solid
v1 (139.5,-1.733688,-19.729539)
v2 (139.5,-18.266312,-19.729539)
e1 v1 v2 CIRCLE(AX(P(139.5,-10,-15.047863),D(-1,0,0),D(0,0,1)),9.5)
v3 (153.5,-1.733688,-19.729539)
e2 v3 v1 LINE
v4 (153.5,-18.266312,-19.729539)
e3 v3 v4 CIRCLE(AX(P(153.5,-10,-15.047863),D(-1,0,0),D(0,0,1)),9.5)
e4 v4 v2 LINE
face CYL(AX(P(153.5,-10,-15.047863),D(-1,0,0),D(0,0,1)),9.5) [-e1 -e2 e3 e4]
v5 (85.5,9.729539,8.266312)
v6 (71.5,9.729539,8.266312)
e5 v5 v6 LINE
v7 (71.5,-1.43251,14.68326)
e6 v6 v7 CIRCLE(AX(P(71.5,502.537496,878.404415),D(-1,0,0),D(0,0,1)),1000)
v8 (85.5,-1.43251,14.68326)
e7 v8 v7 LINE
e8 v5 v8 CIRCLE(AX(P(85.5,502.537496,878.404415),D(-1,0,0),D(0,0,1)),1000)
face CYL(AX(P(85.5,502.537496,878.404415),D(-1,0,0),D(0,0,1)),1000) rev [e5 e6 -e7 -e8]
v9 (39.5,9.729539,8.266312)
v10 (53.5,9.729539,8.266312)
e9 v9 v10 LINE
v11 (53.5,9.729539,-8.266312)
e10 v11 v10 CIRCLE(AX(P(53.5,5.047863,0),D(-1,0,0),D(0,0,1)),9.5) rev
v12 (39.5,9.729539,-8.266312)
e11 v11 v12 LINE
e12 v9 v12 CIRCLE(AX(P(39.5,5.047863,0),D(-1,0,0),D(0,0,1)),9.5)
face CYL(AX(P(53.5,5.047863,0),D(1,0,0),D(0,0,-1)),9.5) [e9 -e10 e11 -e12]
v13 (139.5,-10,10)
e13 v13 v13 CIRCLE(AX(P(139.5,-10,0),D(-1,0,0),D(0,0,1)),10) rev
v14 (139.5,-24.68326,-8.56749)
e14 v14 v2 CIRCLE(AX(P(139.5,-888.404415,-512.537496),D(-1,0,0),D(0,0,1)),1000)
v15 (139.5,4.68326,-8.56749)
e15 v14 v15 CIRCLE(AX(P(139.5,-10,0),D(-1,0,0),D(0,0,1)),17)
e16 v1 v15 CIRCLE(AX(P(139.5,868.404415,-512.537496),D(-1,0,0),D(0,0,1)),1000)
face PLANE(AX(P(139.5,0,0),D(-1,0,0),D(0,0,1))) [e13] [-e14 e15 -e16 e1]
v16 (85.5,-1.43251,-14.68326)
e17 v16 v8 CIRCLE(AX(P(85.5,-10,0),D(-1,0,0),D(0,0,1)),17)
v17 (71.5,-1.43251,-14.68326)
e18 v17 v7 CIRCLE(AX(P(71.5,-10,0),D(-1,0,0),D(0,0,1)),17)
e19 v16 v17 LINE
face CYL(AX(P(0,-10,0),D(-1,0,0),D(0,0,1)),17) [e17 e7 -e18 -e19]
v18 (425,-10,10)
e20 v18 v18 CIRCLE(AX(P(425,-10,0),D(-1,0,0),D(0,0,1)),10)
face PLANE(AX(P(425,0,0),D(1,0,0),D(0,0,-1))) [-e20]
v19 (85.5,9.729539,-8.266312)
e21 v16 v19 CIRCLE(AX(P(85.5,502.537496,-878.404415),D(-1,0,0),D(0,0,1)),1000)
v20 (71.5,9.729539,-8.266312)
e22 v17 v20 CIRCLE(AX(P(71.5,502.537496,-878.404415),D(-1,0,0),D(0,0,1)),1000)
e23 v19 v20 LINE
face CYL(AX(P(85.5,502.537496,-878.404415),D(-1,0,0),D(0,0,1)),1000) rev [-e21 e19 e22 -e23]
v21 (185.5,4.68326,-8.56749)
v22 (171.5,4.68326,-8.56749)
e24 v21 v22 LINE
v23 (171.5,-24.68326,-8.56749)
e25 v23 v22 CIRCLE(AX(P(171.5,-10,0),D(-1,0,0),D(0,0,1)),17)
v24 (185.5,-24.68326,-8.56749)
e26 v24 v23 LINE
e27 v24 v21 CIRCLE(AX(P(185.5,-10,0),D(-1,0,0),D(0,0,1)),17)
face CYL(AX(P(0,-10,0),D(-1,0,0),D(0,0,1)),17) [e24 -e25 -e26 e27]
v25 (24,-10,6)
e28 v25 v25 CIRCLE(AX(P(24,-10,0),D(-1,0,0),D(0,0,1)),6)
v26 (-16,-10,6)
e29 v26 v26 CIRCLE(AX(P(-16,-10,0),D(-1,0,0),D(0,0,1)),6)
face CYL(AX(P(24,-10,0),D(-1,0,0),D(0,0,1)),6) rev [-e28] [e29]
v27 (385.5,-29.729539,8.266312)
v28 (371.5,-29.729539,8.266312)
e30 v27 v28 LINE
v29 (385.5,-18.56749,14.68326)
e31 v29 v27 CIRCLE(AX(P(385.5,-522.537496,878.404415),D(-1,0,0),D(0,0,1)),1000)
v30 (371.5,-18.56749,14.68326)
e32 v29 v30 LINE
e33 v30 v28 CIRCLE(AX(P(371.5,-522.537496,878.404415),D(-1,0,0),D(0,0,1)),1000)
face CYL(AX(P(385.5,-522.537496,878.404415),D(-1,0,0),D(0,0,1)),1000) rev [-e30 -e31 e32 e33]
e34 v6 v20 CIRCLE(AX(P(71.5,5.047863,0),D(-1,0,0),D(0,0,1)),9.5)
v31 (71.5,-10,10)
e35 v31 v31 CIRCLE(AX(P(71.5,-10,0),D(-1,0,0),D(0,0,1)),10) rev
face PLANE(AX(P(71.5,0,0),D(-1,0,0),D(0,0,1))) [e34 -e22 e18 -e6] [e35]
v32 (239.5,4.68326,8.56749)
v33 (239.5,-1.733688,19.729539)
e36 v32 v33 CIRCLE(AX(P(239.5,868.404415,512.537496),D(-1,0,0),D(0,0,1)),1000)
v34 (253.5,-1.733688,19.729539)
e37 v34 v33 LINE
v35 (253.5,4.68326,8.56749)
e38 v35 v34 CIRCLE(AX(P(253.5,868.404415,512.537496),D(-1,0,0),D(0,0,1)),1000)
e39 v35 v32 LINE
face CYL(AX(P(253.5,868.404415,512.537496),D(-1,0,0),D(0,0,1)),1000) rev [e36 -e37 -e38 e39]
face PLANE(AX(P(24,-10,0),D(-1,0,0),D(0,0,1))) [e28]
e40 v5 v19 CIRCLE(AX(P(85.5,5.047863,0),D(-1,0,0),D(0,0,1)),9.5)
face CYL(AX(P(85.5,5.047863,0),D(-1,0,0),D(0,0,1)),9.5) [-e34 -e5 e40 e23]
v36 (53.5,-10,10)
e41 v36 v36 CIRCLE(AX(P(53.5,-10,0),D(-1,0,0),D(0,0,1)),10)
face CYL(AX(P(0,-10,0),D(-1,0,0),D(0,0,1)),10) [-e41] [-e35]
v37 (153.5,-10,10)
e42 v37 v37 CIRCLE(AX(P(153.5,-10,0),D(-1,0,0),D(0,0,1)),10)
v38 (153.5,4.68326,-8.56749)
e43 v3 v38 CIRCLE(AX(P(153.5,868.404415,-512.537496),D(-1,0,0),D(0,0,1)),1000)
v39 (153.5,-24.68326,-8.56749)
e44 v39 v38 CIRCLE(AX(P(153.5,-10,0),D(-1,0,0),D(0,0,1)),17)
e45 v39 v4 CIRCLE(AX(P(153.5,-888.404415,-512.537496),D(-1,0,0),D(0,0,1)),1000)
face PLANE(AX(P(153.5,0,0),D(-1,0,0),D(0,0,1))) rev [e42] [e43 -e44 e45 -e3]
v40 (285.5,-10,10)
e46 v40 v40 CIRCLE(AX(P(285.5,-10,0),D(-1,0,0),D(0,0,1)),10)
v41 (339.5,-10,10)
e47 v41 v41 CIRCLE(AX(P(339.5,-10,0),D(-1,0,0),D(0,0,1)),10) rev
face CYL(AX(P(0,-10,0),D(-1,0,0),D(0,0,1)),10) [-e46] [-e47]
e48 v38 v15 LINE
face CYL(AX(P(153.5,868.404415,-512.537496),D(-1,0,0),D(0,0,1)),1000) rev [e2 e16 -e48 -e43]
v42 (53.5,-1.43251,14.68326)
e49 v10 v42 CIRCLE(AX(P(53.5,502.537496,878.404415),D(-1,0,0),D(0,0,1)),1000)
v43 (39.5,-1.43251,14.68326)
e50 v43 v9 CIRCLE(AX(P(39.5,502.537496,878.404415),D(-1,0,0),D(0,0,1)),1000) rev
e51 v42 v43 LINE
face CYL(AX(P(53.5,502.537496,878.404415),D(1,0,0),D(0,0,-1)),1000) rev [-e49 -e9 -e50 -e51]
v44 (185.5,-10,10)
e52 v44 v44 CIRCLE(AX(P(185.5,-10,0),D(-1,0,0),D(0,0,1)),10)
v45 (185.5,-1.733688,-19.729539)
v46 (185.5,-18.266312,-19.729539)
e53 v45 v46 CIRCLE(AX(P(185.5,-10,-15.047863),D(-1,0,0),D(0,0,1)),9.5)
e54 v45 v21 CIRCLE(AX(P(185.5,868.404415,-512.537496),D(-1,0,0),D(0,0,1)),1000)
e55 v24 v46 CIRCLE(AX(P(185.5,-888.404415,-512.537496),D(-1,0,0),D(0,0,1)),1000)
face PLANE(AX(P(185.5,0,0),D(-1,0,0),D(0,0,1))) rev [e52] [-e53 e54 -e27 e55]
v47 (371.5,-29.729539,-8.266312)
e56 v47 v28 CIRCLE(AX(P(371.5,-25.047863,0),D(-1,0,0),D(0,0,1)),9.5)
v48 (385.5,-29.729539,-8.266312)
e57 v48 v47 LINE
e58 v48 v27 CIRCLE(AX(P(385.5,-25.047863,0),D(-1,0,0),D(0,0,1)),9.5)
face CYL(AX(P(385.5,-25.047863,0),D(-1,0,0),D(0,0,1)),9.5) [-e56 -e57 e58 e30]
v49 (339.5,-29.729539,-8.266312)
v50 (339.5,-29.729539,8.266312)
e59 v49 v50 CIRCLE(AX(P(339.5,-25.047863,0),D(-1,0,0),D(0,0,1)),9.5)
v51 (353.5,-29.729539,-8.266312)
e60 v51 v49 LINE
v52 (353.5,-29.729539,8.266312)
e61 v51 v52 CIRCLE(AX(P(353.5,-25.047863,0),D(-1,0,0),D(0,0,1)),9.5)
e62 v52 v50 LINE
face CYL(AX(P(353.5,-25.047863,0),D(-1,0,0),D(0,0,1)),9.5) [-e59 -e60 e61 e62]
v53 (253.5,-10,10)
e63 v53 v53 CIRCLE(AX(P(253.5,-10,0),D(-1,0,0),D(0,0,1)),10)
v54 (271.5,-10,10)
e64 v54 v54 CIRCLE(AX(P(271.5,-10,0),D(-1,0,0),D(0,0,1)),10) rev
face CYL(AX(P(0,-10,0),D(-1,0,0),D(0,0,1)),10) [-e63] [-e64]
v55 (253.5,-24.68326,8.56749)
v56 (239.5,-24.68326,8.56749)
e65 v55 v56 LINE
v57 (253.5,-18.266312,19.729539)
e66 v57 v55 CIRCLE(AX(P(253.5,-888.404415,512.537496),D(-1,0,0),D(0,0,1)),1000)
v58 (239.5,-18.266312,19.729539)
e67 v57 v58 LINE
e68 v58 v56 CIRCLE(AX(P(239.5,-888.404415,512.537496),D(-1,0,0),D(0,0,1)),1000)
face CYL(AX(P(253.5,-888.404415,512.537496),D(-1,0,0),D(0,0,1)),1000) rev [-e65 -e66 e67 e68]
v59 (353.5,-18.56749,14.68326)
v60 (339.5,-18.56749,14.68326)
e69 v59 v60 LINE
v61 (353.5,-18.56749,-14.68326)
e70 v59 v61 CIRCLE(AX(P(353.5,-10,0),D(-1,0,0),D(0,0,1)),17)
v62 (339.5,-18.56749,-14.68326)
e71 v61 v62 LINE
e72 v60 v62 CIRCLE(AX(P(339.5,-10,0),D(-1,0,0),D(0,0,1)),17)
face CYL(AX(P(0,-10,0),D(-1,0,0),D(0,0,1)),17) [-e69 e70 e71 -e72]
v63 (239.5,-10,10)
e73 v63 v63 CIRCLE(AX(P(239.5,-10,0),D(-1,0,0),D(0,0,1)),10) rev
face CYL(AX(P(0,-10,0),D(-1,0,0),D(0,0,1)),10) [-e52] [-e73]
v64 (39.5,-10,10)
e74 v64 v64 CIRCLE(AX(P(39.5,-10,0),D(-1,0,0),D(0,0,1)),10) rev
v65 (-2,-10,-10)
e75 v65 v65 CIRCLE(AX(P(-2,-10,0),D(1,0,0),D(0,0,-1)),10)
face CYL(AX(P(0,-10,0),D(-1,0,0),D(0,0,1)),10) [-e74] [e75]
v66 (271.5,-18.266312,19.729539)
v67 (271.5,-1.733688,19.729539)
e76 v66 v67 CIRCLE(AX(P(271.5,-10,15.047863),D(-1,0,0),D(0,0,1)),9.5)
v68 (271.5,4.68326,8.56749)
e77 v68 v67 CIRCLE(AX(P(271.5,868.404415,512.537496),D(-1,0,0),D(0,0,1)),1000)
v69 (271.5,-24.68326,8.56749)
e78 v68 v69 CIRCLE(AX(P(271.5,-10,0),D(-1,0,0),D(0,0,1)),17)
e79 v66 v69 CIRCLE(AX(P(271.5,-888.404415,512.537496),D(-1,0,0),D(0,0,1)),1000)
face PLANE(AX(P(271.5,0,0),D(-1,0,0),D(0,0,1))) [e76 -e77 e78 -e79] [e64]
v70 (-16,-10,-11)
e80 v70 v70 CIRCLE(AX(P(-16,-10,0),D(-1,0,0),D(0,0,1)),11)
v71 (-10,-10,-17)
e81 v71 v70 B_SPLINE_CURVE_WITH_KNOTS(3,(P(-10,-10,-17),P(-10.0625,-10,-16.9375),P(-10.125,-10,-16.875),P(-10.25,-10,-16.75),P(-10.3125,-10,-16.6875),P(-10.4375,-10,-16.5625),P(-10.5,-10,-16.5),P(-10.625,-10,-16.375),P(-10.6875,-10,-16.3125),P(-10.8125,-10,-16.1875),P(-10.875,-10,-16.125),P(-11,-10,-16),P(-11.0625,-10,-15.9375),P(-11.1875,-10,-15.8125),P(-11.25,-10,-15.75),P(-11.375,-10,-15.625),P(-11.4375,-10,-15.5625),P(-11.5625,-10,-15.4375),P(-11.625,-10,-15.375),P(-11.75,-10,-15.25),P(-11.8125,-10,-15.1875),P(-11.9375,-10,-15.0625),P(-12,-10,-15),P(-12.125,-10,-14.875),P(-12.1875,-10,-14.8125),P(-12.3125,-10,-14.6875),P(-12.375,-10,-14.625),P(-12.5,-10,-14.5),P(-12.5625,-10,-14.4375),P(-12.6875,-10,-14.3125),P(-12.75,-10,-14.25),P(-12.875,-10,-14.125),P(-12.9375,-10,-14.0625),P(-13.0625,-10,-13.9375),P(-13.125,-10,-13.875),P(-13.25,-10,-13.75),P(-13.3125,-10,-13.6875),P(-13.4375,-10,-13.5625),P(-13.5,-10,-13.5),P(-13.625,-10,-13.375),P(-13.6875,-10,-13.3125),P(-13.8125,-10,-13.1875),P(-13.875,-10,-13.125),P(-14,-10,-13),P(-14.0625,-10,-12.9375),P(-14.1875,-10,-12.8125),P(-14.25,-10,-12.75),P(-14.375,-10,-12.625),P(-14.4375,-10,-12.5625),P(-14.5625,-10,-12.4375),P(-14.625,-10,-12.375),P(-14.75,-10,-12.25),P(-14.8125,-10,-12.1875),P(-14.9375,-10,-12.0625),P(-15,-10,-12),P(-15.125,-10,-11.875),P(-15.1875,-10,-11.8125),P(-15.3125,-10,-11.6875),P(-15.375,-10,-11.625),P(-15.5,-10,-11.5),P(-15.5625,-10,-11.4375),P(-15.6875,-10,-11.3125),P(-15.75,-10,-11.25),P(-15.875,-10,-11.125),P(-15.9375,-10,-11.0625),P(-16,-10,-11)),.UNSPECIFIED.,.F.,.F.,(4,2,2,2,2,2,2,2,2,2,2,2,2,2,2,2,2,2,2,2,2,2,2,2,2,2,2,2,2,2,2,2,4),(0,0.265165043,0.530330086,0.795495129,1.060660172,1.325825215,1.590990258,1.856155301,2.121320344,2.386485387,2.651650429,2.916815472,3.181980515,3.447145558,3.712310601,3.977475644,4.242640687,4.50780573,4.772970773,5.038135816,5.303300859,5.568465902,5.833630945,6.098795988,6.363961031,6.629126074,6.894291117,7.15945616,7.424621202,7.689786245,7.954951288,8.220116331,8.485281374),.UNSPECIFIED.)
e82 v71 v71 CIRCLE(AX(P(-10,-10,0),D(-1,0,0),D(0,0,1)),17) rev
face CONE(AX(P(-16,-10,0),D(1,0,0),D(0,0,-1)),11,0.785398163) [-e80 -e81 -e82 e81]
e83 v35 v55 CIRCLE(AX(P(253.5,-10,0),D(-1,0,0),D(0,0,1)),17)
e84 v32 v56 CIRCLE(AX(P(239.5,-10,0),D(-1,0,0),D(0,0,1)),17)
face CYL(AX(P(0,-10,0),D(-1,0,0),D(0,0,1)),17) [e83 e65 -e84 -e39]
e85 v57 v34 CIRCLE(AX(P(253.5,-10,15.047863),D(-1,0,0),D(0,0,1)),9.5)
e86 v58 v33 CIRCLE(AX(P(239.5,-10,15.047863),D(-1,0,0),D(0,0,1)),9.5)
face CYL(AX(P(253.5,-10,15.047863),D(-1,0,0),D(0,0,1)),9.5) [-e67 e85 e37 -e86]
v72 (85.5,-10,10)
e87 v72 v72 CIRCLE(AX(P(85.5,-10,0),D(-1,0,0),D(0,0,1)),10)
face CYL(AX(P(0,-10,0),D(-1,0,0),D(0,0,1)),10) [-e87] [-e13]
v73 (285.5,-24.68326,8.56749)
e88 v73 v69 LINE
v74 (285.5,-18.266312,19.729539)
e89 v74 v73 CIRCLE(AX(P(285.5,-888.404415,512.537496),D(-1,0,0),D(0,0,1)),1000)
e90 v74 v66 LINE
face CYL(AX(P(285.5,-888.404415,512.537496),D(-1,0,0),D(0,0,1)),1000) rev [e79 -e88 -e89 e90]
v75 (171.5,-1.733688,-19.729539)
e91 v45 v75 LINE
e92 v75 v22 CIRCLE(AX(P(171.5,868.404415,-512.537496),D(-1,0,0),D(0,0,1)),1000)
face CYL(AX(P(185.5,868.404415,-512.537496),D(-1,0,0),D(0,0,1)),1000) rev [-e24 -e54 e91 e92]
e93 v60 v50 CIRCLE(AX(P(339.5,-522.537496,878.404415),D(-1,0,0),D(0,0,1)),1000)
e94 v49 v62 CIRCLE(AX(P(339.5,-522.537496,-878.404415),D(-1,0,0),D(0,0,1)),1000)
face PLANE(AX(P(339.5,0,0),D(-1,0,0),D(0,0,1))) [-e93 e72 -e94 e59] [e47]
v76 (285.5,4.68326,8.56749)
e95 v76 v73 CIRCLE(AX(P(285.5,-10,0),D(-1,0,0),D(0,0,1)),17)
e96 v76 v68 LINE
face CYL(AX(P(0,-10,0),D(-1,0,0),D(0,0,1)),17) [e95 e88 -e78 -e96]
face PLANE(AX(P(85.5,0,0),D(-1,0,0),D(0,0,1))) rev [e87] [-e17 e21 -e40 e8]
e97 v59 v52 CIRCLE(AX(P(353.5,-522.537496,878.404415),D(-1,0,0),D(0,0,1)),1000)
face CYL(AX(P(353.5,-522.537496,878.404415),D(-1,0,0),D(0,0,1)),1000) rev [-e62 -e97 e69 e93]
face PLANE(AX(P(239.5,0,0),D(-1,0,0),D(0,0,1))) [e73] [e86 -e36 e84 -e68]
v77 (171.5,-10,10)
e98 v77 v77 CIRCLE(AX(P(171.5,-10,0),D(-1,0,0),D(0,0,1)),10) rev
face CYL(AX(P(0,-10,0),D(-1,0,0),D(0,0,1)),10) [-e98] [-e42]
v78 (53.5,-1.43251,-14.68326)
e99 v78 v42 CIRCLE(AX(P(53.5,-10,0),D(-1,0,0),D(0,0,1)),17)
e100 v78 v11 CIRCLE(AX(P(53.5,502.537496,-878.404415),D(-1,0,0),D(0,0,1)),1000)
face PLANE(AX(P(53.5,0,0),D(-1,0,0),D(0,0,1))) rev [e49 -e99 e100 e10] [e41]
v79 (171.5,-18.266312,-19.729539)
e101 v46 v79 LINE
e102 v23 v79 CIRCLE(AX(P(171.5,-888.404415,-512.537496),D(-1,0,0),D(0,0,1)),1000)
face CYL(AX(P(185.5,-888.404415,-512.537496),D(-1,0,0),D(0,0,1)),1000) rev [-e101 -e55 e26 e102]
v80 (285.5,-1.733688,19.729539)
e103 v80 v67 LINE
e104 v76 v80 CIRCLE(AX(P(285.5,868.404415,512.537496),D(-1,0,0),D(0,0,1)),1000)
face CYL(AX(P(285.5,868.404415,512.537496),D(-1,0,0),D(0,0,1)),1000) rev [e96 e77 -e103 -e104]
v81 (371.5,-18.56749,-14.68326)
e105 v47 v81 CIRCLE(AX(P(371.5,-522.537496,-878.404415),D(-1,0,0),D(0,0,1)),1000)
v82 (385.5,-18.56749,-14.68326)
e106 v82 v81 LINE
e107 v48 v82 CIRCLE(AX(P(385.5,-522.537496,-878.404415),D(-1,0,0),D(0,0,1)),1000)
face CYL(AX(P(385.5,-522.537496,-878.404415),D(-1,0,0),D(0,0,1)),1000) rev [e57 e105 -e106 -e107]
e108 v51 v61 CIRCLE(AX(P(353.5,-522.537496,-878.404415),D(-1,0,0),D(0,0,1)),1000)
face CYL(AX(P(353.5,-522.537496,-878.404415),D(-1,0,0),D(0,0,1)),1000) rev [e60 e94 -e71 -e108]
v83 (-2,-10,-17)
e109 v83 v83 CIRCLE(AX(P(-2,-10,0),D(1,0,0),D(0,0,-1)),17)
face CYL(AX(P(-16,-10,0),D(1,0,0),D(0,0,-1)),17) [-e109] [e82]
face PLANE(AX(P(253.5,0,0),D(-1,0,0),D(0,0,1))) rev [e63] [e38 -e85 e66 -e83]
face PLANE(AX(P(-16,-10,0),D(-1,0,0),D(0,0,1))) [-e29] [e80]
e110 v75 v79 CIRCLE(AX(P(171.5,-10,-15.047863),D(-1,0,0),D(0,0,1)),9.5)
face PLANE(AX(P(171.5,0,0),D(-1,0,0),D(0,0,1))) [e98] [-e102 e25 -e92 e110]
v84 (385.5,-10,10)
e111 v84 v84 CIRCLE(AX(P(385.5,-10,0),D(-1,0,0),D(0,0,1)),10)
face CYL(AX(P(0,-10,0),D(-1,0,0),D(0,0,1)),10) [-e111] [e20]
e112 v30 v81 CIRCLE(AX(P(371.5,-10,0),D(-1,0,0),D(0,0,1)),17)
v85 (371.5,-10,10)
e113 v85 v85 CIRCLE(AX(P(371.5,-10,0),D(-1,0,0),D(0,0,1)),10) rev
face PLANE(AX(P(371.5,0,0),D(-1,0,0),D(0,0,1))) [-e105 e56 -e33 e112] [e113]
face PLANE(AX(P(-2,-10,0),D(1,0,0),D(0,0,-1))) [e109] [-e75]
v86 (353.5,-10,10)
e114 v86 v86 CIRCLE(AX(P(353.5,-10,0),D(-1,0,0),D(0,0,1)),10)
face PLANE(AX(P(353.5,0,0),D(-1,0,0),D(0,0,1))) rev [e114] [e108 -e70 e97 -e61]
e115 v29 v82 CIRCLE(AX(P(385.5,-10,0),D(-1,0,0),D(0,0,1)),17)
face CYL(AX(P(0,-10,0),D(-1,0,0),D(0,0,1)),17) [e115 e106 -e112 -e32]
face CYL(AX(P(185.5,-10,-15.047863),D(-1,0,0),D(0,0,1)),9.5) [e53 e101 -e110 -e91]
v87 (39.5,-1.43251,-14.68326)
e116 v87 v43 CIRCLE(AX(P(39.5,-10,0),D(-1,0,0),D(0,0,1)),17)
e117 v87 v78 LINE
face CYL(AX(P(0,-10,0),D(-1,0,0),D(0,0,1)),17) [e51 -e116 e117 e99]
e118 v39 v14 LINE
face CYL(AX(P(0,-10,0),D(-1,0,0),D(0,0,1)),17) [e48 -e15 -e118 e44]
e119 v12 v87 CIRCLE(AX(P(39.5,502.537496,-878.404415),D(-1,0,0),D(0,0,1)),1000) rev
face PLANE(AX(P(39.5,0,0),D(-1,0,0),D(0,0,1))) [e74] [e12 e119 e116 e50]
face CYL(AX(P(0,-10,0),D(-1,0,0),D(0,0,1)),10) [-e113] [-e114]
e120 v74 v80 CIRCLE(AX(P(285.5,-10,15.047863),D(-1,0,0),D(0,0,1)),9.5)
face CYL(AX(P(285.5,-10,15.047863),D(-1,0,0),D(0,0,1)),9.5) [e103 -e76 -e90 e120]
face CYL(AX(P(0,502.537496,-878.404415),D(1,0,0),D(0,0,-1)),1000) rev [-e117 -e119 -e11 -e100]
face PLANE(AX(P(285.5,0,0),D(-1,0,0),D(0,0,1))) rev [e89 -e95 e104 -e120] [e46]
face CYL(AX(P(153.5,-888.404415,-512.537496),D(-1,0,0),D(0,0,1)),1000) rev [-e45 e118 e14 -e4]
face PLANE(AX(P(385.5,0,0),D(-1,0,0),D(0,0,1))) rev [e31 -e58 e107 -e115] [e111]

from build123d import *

# Parameters (mm, degrees)
BOSS_EXTRUDE2_DEPTH  = 14
FILLET3_R            = 9.5
FILLET5_R            = 1000
BOSS_EXTRUDE5_DEPTH  = 14
BOSS_EXTRUDE6_DEPTH  = 14
BOSS_EXTRUDE7_DEPTH  = 14
BOSS_EXTRUDE8_DEPTH  = 14
BOSS_EXTRUDE9_DEPTH  = 14
BOSS_EXTRUDE10_DEPTH = 14
BOSS_EXTRUDE11_DEPTH = 14
SKETCH1_6_W          = 16
SKETCH1_6_H          = 7
BOSS_EXTRUDE12_DEPTH = 16
FILLET6_R            = 1000
FILLET7_R            = 4
BOSS_EXTRUDE13_DEPTH = 16
BOSS_EXTRUDE14_DEPTH = 16
BOSS_EXTRUDE15_DEPTH = 16
FRONT_START          = 16
SKETCH22_R           = 17
FRONT_DEPTH          = 16
CHAMFER1_SIZE        = 6
SKETCH23_R           = 6
CUT_EXTRUDE1_DEPTH   = 40
CUT_EXTRUDE2_START   = -2
SKETCH24_R           = 17
SKETCH24_R_2         = 10
CUT_EXTRUDE2_DEPTH   = 2
CUT_EXTRUDE4_DEPTH   = 16
CUT_EXTRUDE5_DEPTH   = 16
CUT_EXTRUDE6_DEPTH   = 16
CUT_EXTRUDE7_DEPTH   = 16
SKETCH33_R           = 10
BOSS_EXTRUDE16_DEPTH = 16
SKETCH32_R           = 10
BOSS_EXTRUDE17_DEPTH = 16
SKETCH31_R           = 10
BOSS_EXTRUDE18_DEPTH = 16
SKETCH30_R           = 10
BOSS_EXTRUDE19_DEPTH = 16


# Some blends are built 0.0001 mm under size
with BuildPart() as part:
    # Sketch1 → Revolve1 (revolve)
    with BuildSketch(Plane.XY, mode=Mode.PRIVATE) as revolve1_sk:
        Polygon((10, 0), (0, 0), (0, -10), (425, -10), (425, 0), (415, 0), (385.5, 0), (378.5, 0), (371.5, 0), (370.5, 0), (354.5, 0), (353.5, 0), (346.5, 0), (339.5, 0), (285.5, 0), (278.5, 0), (271.5, 0), (270.5, 0), (254.5, 0), (253.5, 0), (246.5, 0), (239.5, 0), (185.5, 0), (178.5, 0), (171.5, 0), (170.5, 0), (154.5, 0), (153.5, 0), (146.5, 0), (139.5, 0), (85.5, 0), (78.5, 0), (71.5, 0), (70.5, 0), (54.5, 0), (53.5, 0), (46.5, 0), (39.5, 0), align=None)
    revolve(revolve1_sk.sketch.rotate(Axis((0, -10, 0), (1, 0, 0)), 90), axis=Axis((0, -10, 0), (1, 0, 0)))

    # Sketch1<5> → Revolve2 (revolve)
    with BuildSketch(Plane.XY, mode=Mode.PRIVATE) as revolve2_sk:
        Polygon((39.5, 7), (39.5, 0), (46.5, 0), (53.5, 0), (53.5, 7), align=None)
        Polygon((71.5, 7), (71.5, 0), (78.5, 0), (85.5, 0), (85.5, 7), align=None)
        Polygon((139.5, 7), (139.5, 0), (146.5, 0), (153.5, 0), (153.5, 7), align=None)
        Polygon((171.5, 7), (171.5, 0), (178.5, 0), (185.5, 0), (185.5, 7), align=None)
        Polygon((239.5, 7), (239.5, 0), (246.5, 0), (253.5, 0), (253.5, 7), align=None)
        Polygon((278.5, 0), (285.5, 0), (285.5, 7), (271.5, 7), (271.5, 0), align=None)
        Polygon((346.5, 0), (353.5, 0), (353.5, 7), (339.5, 7), (339.5, 0), align=None)
        Polygon((378.5, 0), (385.5, 0), (385.5, 7), (371.5, 7), (371.5, 0), align=None)
    revolve(revolve2_sk.sketch.rotate(Axis((0, -10, 0), (1, 0, 0)), 90), axis=Axis((0, -10, 0), (1, 0, 0)))

    # Sketch2 → Boss-Extrude2 (add)
    with BuildSketch(Plane.ZY.offset(-39.5)):
        with BuildLine():
            Line((0, 15), (0, 7))
            ThreePointArc((0, 7), (6.16158644, 5.844079416), (11.485254692, 2.533512064))
            Line((11.485254692, 2.533512064), (6, 15))
            Line((6, 15), (0, 15))
        make_face()
        with BuildLine():
            ThreePointArc((-11.485254692, 2.533512064), (-6.16158644, 5.844079416), (0, 7))
            Line((0, 7), (0, 15))
            Line((0, 15), (-6, 15))
            Line((-6, 15), (-11.485254692, 2.533512064))
        make_face()
    extrude(amount=-BOSS_EXTRUDE2_DEPTH)

    # Fillet3
    fillet3_edges = [part.edges().sort_by_distance(p)[0] for p in [
        (46.5, 15, 6),
    ]]
    fillet(fillet3_edges, radius=FILLET3_R)
    fillet3_2_edges = [part.edges().sort_by_distance(p)[0] for p in [
        (46.5, 15, -6),
    ]]
    fillet(fillet3_2_edges, radius=FILLET3_R - 0.0001)  # a hair under: the kernel refuses the full size

    # Fillet5
    fillet5_edges = [part.edges().sort_by_distance(p)[0] for p in [
        (46.5, 2.533512064, 11.485254692),
        (46.5, 2.533512064, -11.485254692),
    ]]
    fillet(fillet5_edges, radius=FILLET5_R)

    # Sketch10 → Boss-Extrude5 (add)
    with BuildSketch(Plane.ZY.offset(-71.5)):
        with BuildLine():
            ThreePointArc((-14.683259634, -1.432509905), (0, 7), (14.683259634, -1.432509905))
            ThreePointArc((14.683259634, -1.432509905), (11.456821538, 4.138186943), (8.266311974, 9.729538737))
            ThreePointArc((8.266311974, 9.729538737), (0, 14.547863146), (-8.266311974, 9.729538737))
            ThreePointArc((-8.266311974, 9.729538737), (-11.456821538, 4.138186943), (-14.683259634, -1.432509905))
        make_face()
    extrude(amount=-BOSS_EXTRUDE5_DEPTH)

    # Sketch11 → Boss-Extrude6 (add)
    with BuildSketch(Plane.ZY.offset(-239.5)):
        with BuildLine():
            ThreePointArc((8.567490095, 4.683259634), (14.741901703, -1.533812299), (17, -10))
            ThreePointArc((17, -10), (14.741901703, -18.466187701), (8.567490095, -24.683259634))
            ThreePointArc((8.567490095, -24.683259634), (14.138186943, -21.456821538), (19.729538737, -18.266311974))
            ThreePointArc((19.729538737, -18.266311974), (24.547863146, -10), (19.729538737, -1.733688026))
            ThreePointArc((19.729538737, -1.733688026), (14.138186943, 1.456821538), (8.567490095, 4.683259634))
        make_face()
    extrude(amount=-BOSS_EXTRUDE6_DEPTH)

    # Sketch12 → Boss-Extrude7 (add)
    with BuildSketch(Plane.ZY.offset(-271.5)):
        with BuildLine():
            ThreePointArc((19.729538737, -18.266311974), (24.547863146, -10), (19.729538737, -1.733688026))
            ThreePointArc((19.729538737, -1.733688026), (14.138186943, 1.456821538), (8.567490095, 4.683259634))
            ThreePointArc((8.567490095, 4.683259634), (-17, -10), (8.567490095, -24.683259634))
            ThreePointArc((8.567490095, -24.683259634), (14.138186943, -21.456821538), (19.729538737, -18.266311974))
        make_face()
    extrude(amount=-BOSS_EXTRUDE7_DEPTH)

    # Sketch14 → Boss-Extrude8 (add)
    with BuildSketch(Plane.ZY.offset(-371.5)):
        with BuildLine():
            ThreePointArc((-8.266311974, -29.729538737), (0, -34.547863146), (8.266311974, -29.729538737))
            ThreePointArc((8.266311974, -29.729538737), (11.456821538, -24.138186943), (14.683259634, -18.567490095))
            ThreePointArc((14.683259634, -18.567490095), (0, 7), (-14.683259634, -18.567490095))
            ThreePointArc((-14.683259634, -18.567490095), (-11.456821538, -24.138186943), (-8.266311974, -29.729538737))
        make_face()
    extrude(amount=-BOSS_EXTRUDE8_DEPTH)

    # Sketch13 → Boss-Extrude9 (add)
    with BuildSketch(Plane.ZY.offset(-339.5)):
        with BuildLine():
            ThreePointArc((-8.266311974, -29.729538737), (0, -34.547863146), (8.266311974, -29.729538737))
            ThreePointArc((8.266311974, -29.729538737), (11.456821538, -24.138186943), (14.683259634, -18.567490095))
            ThreePointArc((14.683259634, -18.567490095), (0, 7), (-14.683259634, -18.567490095))
            ThreePointArc((-14.683259634, -18.567490095), (-11.456821538, -24.138186943), (-8.266311974, -29.729538737))
        make_face()
    extrude(amount=-BOSS_EXTRUDE9_DEPTH)

    # Sketch15 → Boss-Extrude10 (add)
    with BuildSketch(Plane.ZY.offset(-139.5)):
        with BuildLine():
            ThreePointArc((-19.729538737, -1.733688026), (-24.547863146, -10), (-19.729538737, -18.266311974))
            ThreePointArc((-19.729538737, -18.266311974), (-14.138186943, -21.456821538), (-8.567490095, -24.683259634))
            ThreePointArc((-8.567490095, -24.683259634), (17, -10), (-8.567490095, 4.683259634))
            ThreePointArc((-8.567490095, 4.683259634), (-14.138186943, 1.456821538), (-19.729538737, -1.733688026))
        make_face()
    extrude(amount=-BOSS_EXTRUDE10_DEPTH)

    # Sketch16 → Boss-Extrude11 (add)
    with BuildSketch(Plane.ZY.offset(-171.5)):
        with BuildLine():
            ThreePointArc((-19.729538737, -1.733688026), (-24.547863146, -10), (-19.729538737, -18.266311974))
            ThreePointArc((-19.729538737, -18.266311974), (-14.138186943, -21.456821538), (-8.567490095, -24.683259634))
            ThreePointArc((-8.567490095, -24.683259634), (17, -10), (-8.567490095, 4.683259634))
            ThreePointArc((-8.567490095, 4.683259634), (-14.138186943, 1.456821538), (-19.729538737, -1.733688026))
        make_face()
    extrude(amount=-BOSS_EXTRUDE11_DEPTH)

    # Sketch1<6> → Revolve3 (revolve)
    with BuildSketch(Plane.XY, mode=Mode.PRIVATE) as revolve3_sk:
        with Locations((62.5, 3.5)):
            Rectangle(SKETCH1_6_W, SKETCH1_6_H)
        with Locations((162.5, 3.5)):
            Rectangle(SKETCH1_6_W, SKETCH1_6_H)
        with Locations((262.5, 3.5)):
            Rectangle(SKETCH1_6_W, SKETCH1_6_H)
        with Locations((362.5, 3.5)):
            Rectangle(SKETCH1_6_W, SKETCH1_6_H)
    revolve(revolve3_sk.sketch.rotate(Axis((0, -10, 0), (1, 0, 0)), 90), axis=Axis((0, -10, 0), (1, 0, 0)))

    # Sketch17 → Boss-Extrude12 (add)
    with BuildSketch(Plane.ZY.offset(-54.5)):
        Polygon((2, -30), (-2, -30), (-17, -10), (17, -10), align=None)
    extrude(amount=-BOSS_EXTRUDE12_DEPTH)

    # Fillet6
    # the kernel refuses this fillet: 1000 mm, written as the material it adds along each edge
    with BuildSketch(Plane(origin=(70.5, -26.32, -4.76), x_dir=(0, -0.8000000000000175, 0.5999999999999766), z_dir=(-1, 0, 0))) as fillet6_piece_1:
        with BuildLine():
            CenterArc((261.216037906, -966.513429337), FILLET6_R, 104.869364111, 0.609274669)
            ThreePointArc((-5.663055414, -2.783410323), (-2.701251625, -1.656761544), (0, 0))
            Line((0, 0), (4.6, 0))
        make_face()
    extrude(amount=16)
    with BuildSketch(Plane(origin=(70.5, -26.32, 4.76), x_dir=(0, -0.800000000000032, -0.5999999999999576), z_dir=(-1, 0, 0))) as fillet6_piece_2:
        with BuildLine():
            CenterArc((261.216037906, 966.513429337), FILLET6_R, 254.52136122, 0.609274669)
            ThreePointArc((-5.663055414, 2.783410323), (-2.701251625, 1.656761544), (0, 0))
            Line((0, 0), (4.6, 0))
        make_face()
    extrude(amount=16)

    # Fillet7
    fillet7_edges = [part.edges().sort_by_distance(p)[0] for p in [
        (62.5, -30, 2),
        (62.5, -30, -2),
    ]]
    fillet(fillet7_edges, radius=FILLET7_R)

    # Sketch21 → Boss-Extrude13 (add)
    with BuildSketch(Plane.ZY.offset(-354.5)):
        with BuildLine():
            Line((0.614051952, 10), (-0.614051952, 10))
            ThreePointArc((-0.614051952, 10), (-1.922312901, 9.780007049), (-3.086669756, 9.144226645))
            ThreePointArc((-3.086669756, 9.144226645), (-6.7290423, 6.293475446), (-10.384561507, 3.459601863))
            ThreePointArc((-10.384561507, 3.459601863), (0, -27), (10.384561507, 3.459601863))
            ThreePointArc((10.384561507, 3.459601863), (6.7290423, 6.293475446), (3.086669756, 9.144226645))
            ThreePointArc((3.086669756, 9.144226645), (1.922312901, 9.780007049), (0.614051952, 10))
        make_face()
    extrude(amount=-BOSS_EXTRUDE13_DEPTH)

    # Sketch20 → Boss-Extrude14 (add)
    with BuildSketch(Plane.ZY.offset(-254.5)):
        with BuildLine():
            Line((-20, -9.385948048), (-20, -10.614051952))
            ThreePointArc((-20, -10.614051952), (-19.780007049, -11.922312901), (-19.144226645, -13.086669756))
            ThreePointArc((-19.144226645, -13.086669756), (-16.293475446, -16.7290423), (-13.459601863, -20.384561507))
            ThreePointArc((-13.459601863, -20.384561507), (17, -10), (-13.459601863, 0.384561507))
            ThreePointArc((-13.459601863, 0.384561507), (-16.293475446, -3.2709577), (-19.144226645, -6.913330244))
            ThreePointArc((-19.144226645, -6.913330244), (-19.780007049, -8.077687099), (-20, -9.385948048))
        make_face()
    extrude(amount=-BOSS_EXTRUDE14_DEPTH)

    # Sketch19 → Boss-Extrude15 (add)
    with BuildSketch(Plane.ZY.offset(-154.5)):
        with BuildLine():
            Line((20, -10.614051952), (20, -9.385948048))
            ThreePointArc((20, -9.385948048), (19.780007049, -8.077687099), (19.144226645, -6.913330244))
            ThreePointArc((19.144226645, -6.913330244), (16.293475446, -3.2709577), (13.459601863, 0.384561507))
            ThreePointArc((13.459601863, 0.384561507), (-17, -10), (13.459601863, -20.384561507))
            ThreePointArc((13.459601863, -20.384561507), (16.293475446, -16.7290423), (19.144226645, -13.086669756))
            ThreePointArc((19.144226645, -13.086669756), (19.780007049, -11.922312901), (20, -10.614051952))
        make_face()
    extrude(amount=-BOSS_EXTRUDE15_DEPTH)

    # Sketch22 → Front (add)
    with BuildSketch(Plane.ZY.offset(FRONT_START)):
        with Locations((0, -10)):
            Circle(SKETCH22_R)
    extrude(amount=-FRONT_DEPTH)

    # Chamfer1
    chamfer1_edges = [part.edges().sort_by_distance(p)[0] for p in [
        (-16, -10, -17),
    ]]
    chamfer(chamfer1_edges, length=CHAMFER1_SIZE)

    # Sketch23 → Cut-Extrude1 (cut)
    with BuildSketch(Plane.ZY.offset(16)):
        with Locations((0, -10)):
            Circle(SKETCH23_R)
    extrude(amount=-CUT_EXTRUDE1_DEPTH, mode=Mode.SUBTRACT)

    # Sketch24 → Cut-Extrude2 (cut)
    with BuildSketch(Plane(origin=(0, 0, 0), x_dir=(0, 0, -1), z_dir=(1, 0, 0)).offset(CUT_EXTRUDE2_START)):
        with Locations((0, -10)):
            Circle(SKETCH24_R)
        with Locations(Location((0, -10, 0), (0, 0, 180))):
            Circle(SKETCH24_R_2, mode=Mode.SUBTRACT)
    extrude(amount=CUT_EXTRUDE2_DEPTH, mode=Mode.SUBTRACT)

    # Sketch28 → Cut-Extrude4 (cut)
    with BuildSketch(Plane.ZY.offset(-354.5)):
        with BuildLine():
            Line((0.614051952, 10), (-0.614051952, 10))
            ThreePointArc((-0.614051952, 10), (-1.922312901, 9.780007049), (-3.086669756, 9.144226645))
            ThreePointArc((-3.086669756, 9.144226645), (-6.7290423, 6.293475446), (-10.384561507, 3.459601863))
            ThreePointArc((-10.384561507, 3.459601863), (0, -27), (10.384561507, 3.459601863))
            ThreePointArc((10.384561507, 3.459601863), (6.7290423, 6.293475446), (3.086669756, 9.144226645))
            ThreePointArc((3.086669756, 9.144226645), (1.922312901, 9.780007049), (0.614051952, 10))
        make_face()
    extrude(amount=-CUT_EXTRUDE4_DEPTH, mode=Mode.SUBTRACT)


with BuildPart() as cut_extrude4_piece_1:
    # of the separate pieces the step leaves, piece 1, a body of its own (cut_extrude4_pieces)
    add(part.part.solids().sort_by_distance((-10, -10, 17))[0])

    # Sketch27 → Cut-Extrude5 (cut)
    with BuildSketch(Plane.ZY.offset(-254.5)):
        with BuildLine():
            Line((-20, -9.385948048), (-20, -10.614051952))
            ThreePointArc((-20, -10.614051952), (-19.780007049, -11.922312901), (-19.144226645, -13.086669756))
            ThreePointArc((-19.144226645, -13.086669756), (-16.293475446, -16.7290423), (-13.459601863, -20.384561507))
            ThreePointArc((-13.459601863, -20.384561507), (17, -10), (-13.459601863, 0.384561507))
            ThreePointArc((-13.459601863, 0.384561507), (-16.293475446, -3.2709577), (-19.144226645, -6.913330244))
            ThreePointArc((-19.144226645, -6.913330244), (-19.780007049, -8.077687099), (-20, -9.385948048))
        make_face()
    extrude(amount=-CUT_EXTRUDE5_DEPTH, mode=Mode.SUBTRACT)


with BuildPart() as cut_extrude4_piece_2:
    # of the separate pieces the step leaves, piece 2, a body of its own (cut_extrude4_pieces)
    add(part.part.solids().sort_by_distance((370.5, -10, 10))[0])



with BuildPart() as cut_extrude5_piece_1:
    # of the separate pieces the step leaves, piece 1, a body of its own (cut_extrude5_pieces)
    add(cut_extrude4_piece_1.part.solids().sort_by_distance((-10, -10, 17))[0])

    # Sketch26 → Cut-Extrude6 (cut)
    with BuildSketch(Plane.ZY.offset(-154.5)):
        with BuildLine():
            Line((20, -10.614051952), (20, -9.385948048))
            ThreePointArc((20, -9.385948048), (19.780007049, -8.077687099), (19.144226645, -6.913330244))
            ThreePointArc((19.144226645, -6.913330244), (16.293475446, -3.2709577), (13.459601863, 0.384561507))
            ThreePointArc((13.459601863, 0.384561507), (-17, -10), (13.459601863, -20.384561507))
            ThreePointArc((13.459601863, -20.384561507), (16.293475446, -16.7290423), (19.144226645, -13.086669756))
            ThreePointArc((19.144226645, -13.086669756), (19.780007049, -11.922312901), (20, -10.614051952))
        make_face()
    extrude(amount=-CUT_EXTRUDE6_DEPTH, mode=Mode.SUBTRACT)


with BuildPart() as cut_extrude5_piece_2:
    # of the separate pieces the step leaves, piece 2, a body of its own (cut_extrude5_pieces)
    add(cut_extrude4_piece_1.part.solids().sort_by_distance((270.5, -10, 10))[0])


with BuildPart() as cut_extrude6_piece_1:
    # of the separate pieces the step leaves, piece 1, a body of its own (cut_extrude6_pieces)
    add(cut_extrude5_piece_1.part.solids().sort_by_distance((-10, -10, 17))[0])

    # Sketch25 → Cut-Extrude7 (cut)
    with BuildSketch(Plane.ZY.offset(-54.5)):
        with BuildLine():
            Line((-0.614051952, -30), (0.614051952, -30))
            ThreePointArc((0.614051952, -30), (1.922312901, -29.780007049), (3.086669756, -29.144226645))
            ThreePointArc((3.086669756, -29.144226645), (6.7290423, -26.293475446), (10.384561507, -23.459601863))
            ThreePointArc((10.384561507, -23.459601863), (0, 7), (-10.384561507, -23.459601863))
            ThreePointArc((-10.384561507, -23.459601863), (-6.7290423, -26.293475446), (-3.086669756, -29.144226645))
            ThreePointArc((-3.086669756, -29.144226645), (-1.922312901, -29.780007049), (-0.614051952, -30))
        make_face()
    extrude(amount=-CUT_EXTRUDE7_DEPTH, mode=Mode.SUBTRACT)


with BuildPart() as cut_extrude6_piece_2:
    # of the separate pieces the step leaves, piece 2, a body of its own (cut_extrude6_pieces)
    add(cut_extrude5_piece_1.part.solids().sort_by_distance((170.5, -10, 10))[0])


with BuildPart() as cut_extrude7_piece_1:
    # of the separate pieces the step leaves, piece 1, a body of its own (cut_extrude7_pieces)
    add(cut_extrude6_piece_1.part.solids().sort_by_distance((71.5, -10, 10))[0])


with BuildPart() as cut_extrude7_piece_2:
    # of the separate pieces the step leaves, piece 2, a body of its own (cut_extrude7_pieces)
    add(cut_extrude6_piece_1.part.solids().sort_by_distance((-10, -10, 17))[0])


with BuildPart() as cut_extrude4_piece_2_1:
    add(cut_extrude4_piece_2.part)

    add(cut_extrude5_piece_2.part)  # Boss-Extrude16 merges Cut-Extrude5 piece 2
    # Sketch33 → Boss-Extrude16 (add)
    with BuildSketch(Plane(origin=(354.5, 0, 0), x_dir=(0, 0, -1), z_dir=(1, 0, 0))):
        with Locations(Location((0, -10, 0), (0, 0, 180))):
            Circle(SKETCH33_R)
    extrude(amount=BOSS_EXTRUDE16_DEPTH)


    add(cut_extrude6_piece_2.part)  # Boss-Extrude17 merges Cut-Extrude6 piece 2
    # Sketch32 → Boss-Extrude17 (add)
    with BuildSketch(Plane(origin=(254.5, 0, 0), x_dir=(0, 0, -1), z_dir=(1, 0, 0))):
        with Locations(Location((0, -10, 0), (0, 0, 180))):
            Circle(SKETCH32_R)
    extrude(amount=BOSS_EXTRUDE17_DEPTH)


    add(cut_extrude7_piece_1.part)  # Boss-Extrude18 merges Cut-Extrude7 piece 1
    # Sketch31 → Boss-Extrude18 (add)
    with BuildSketch(Plane(origin=(154.5, 0, 0), x_dir=(0, 0, -1), z_dir=(1, 0, 0))):
        with Locations(Location((0, -10, 0), (0, 0, 180))):
            Circle(SKETCH31_R)
    extrude(amount=BOSS_EXTRUDE18_DEPTH)


    add(cut_extrude7_piece_2.part)  # Boss-Extrude19 merges Cut-Extrude7 piece 2
    # Sketch30 → Boss-Extrude19 (add)
    with BuildSketch(Plane(origin=(54.5, 0, 0), x_dir=(0, 0, -1), z_dir=(1, 0, 0))):
        with Locations(Location((0, -10, 0), (0, 0, 180))):
            Circle(SKETCH30_R)
    extrude(amount=BOSS_EXTRUDE19_DEPTH)


solid = cut_extrude4_piece_2_1.part
